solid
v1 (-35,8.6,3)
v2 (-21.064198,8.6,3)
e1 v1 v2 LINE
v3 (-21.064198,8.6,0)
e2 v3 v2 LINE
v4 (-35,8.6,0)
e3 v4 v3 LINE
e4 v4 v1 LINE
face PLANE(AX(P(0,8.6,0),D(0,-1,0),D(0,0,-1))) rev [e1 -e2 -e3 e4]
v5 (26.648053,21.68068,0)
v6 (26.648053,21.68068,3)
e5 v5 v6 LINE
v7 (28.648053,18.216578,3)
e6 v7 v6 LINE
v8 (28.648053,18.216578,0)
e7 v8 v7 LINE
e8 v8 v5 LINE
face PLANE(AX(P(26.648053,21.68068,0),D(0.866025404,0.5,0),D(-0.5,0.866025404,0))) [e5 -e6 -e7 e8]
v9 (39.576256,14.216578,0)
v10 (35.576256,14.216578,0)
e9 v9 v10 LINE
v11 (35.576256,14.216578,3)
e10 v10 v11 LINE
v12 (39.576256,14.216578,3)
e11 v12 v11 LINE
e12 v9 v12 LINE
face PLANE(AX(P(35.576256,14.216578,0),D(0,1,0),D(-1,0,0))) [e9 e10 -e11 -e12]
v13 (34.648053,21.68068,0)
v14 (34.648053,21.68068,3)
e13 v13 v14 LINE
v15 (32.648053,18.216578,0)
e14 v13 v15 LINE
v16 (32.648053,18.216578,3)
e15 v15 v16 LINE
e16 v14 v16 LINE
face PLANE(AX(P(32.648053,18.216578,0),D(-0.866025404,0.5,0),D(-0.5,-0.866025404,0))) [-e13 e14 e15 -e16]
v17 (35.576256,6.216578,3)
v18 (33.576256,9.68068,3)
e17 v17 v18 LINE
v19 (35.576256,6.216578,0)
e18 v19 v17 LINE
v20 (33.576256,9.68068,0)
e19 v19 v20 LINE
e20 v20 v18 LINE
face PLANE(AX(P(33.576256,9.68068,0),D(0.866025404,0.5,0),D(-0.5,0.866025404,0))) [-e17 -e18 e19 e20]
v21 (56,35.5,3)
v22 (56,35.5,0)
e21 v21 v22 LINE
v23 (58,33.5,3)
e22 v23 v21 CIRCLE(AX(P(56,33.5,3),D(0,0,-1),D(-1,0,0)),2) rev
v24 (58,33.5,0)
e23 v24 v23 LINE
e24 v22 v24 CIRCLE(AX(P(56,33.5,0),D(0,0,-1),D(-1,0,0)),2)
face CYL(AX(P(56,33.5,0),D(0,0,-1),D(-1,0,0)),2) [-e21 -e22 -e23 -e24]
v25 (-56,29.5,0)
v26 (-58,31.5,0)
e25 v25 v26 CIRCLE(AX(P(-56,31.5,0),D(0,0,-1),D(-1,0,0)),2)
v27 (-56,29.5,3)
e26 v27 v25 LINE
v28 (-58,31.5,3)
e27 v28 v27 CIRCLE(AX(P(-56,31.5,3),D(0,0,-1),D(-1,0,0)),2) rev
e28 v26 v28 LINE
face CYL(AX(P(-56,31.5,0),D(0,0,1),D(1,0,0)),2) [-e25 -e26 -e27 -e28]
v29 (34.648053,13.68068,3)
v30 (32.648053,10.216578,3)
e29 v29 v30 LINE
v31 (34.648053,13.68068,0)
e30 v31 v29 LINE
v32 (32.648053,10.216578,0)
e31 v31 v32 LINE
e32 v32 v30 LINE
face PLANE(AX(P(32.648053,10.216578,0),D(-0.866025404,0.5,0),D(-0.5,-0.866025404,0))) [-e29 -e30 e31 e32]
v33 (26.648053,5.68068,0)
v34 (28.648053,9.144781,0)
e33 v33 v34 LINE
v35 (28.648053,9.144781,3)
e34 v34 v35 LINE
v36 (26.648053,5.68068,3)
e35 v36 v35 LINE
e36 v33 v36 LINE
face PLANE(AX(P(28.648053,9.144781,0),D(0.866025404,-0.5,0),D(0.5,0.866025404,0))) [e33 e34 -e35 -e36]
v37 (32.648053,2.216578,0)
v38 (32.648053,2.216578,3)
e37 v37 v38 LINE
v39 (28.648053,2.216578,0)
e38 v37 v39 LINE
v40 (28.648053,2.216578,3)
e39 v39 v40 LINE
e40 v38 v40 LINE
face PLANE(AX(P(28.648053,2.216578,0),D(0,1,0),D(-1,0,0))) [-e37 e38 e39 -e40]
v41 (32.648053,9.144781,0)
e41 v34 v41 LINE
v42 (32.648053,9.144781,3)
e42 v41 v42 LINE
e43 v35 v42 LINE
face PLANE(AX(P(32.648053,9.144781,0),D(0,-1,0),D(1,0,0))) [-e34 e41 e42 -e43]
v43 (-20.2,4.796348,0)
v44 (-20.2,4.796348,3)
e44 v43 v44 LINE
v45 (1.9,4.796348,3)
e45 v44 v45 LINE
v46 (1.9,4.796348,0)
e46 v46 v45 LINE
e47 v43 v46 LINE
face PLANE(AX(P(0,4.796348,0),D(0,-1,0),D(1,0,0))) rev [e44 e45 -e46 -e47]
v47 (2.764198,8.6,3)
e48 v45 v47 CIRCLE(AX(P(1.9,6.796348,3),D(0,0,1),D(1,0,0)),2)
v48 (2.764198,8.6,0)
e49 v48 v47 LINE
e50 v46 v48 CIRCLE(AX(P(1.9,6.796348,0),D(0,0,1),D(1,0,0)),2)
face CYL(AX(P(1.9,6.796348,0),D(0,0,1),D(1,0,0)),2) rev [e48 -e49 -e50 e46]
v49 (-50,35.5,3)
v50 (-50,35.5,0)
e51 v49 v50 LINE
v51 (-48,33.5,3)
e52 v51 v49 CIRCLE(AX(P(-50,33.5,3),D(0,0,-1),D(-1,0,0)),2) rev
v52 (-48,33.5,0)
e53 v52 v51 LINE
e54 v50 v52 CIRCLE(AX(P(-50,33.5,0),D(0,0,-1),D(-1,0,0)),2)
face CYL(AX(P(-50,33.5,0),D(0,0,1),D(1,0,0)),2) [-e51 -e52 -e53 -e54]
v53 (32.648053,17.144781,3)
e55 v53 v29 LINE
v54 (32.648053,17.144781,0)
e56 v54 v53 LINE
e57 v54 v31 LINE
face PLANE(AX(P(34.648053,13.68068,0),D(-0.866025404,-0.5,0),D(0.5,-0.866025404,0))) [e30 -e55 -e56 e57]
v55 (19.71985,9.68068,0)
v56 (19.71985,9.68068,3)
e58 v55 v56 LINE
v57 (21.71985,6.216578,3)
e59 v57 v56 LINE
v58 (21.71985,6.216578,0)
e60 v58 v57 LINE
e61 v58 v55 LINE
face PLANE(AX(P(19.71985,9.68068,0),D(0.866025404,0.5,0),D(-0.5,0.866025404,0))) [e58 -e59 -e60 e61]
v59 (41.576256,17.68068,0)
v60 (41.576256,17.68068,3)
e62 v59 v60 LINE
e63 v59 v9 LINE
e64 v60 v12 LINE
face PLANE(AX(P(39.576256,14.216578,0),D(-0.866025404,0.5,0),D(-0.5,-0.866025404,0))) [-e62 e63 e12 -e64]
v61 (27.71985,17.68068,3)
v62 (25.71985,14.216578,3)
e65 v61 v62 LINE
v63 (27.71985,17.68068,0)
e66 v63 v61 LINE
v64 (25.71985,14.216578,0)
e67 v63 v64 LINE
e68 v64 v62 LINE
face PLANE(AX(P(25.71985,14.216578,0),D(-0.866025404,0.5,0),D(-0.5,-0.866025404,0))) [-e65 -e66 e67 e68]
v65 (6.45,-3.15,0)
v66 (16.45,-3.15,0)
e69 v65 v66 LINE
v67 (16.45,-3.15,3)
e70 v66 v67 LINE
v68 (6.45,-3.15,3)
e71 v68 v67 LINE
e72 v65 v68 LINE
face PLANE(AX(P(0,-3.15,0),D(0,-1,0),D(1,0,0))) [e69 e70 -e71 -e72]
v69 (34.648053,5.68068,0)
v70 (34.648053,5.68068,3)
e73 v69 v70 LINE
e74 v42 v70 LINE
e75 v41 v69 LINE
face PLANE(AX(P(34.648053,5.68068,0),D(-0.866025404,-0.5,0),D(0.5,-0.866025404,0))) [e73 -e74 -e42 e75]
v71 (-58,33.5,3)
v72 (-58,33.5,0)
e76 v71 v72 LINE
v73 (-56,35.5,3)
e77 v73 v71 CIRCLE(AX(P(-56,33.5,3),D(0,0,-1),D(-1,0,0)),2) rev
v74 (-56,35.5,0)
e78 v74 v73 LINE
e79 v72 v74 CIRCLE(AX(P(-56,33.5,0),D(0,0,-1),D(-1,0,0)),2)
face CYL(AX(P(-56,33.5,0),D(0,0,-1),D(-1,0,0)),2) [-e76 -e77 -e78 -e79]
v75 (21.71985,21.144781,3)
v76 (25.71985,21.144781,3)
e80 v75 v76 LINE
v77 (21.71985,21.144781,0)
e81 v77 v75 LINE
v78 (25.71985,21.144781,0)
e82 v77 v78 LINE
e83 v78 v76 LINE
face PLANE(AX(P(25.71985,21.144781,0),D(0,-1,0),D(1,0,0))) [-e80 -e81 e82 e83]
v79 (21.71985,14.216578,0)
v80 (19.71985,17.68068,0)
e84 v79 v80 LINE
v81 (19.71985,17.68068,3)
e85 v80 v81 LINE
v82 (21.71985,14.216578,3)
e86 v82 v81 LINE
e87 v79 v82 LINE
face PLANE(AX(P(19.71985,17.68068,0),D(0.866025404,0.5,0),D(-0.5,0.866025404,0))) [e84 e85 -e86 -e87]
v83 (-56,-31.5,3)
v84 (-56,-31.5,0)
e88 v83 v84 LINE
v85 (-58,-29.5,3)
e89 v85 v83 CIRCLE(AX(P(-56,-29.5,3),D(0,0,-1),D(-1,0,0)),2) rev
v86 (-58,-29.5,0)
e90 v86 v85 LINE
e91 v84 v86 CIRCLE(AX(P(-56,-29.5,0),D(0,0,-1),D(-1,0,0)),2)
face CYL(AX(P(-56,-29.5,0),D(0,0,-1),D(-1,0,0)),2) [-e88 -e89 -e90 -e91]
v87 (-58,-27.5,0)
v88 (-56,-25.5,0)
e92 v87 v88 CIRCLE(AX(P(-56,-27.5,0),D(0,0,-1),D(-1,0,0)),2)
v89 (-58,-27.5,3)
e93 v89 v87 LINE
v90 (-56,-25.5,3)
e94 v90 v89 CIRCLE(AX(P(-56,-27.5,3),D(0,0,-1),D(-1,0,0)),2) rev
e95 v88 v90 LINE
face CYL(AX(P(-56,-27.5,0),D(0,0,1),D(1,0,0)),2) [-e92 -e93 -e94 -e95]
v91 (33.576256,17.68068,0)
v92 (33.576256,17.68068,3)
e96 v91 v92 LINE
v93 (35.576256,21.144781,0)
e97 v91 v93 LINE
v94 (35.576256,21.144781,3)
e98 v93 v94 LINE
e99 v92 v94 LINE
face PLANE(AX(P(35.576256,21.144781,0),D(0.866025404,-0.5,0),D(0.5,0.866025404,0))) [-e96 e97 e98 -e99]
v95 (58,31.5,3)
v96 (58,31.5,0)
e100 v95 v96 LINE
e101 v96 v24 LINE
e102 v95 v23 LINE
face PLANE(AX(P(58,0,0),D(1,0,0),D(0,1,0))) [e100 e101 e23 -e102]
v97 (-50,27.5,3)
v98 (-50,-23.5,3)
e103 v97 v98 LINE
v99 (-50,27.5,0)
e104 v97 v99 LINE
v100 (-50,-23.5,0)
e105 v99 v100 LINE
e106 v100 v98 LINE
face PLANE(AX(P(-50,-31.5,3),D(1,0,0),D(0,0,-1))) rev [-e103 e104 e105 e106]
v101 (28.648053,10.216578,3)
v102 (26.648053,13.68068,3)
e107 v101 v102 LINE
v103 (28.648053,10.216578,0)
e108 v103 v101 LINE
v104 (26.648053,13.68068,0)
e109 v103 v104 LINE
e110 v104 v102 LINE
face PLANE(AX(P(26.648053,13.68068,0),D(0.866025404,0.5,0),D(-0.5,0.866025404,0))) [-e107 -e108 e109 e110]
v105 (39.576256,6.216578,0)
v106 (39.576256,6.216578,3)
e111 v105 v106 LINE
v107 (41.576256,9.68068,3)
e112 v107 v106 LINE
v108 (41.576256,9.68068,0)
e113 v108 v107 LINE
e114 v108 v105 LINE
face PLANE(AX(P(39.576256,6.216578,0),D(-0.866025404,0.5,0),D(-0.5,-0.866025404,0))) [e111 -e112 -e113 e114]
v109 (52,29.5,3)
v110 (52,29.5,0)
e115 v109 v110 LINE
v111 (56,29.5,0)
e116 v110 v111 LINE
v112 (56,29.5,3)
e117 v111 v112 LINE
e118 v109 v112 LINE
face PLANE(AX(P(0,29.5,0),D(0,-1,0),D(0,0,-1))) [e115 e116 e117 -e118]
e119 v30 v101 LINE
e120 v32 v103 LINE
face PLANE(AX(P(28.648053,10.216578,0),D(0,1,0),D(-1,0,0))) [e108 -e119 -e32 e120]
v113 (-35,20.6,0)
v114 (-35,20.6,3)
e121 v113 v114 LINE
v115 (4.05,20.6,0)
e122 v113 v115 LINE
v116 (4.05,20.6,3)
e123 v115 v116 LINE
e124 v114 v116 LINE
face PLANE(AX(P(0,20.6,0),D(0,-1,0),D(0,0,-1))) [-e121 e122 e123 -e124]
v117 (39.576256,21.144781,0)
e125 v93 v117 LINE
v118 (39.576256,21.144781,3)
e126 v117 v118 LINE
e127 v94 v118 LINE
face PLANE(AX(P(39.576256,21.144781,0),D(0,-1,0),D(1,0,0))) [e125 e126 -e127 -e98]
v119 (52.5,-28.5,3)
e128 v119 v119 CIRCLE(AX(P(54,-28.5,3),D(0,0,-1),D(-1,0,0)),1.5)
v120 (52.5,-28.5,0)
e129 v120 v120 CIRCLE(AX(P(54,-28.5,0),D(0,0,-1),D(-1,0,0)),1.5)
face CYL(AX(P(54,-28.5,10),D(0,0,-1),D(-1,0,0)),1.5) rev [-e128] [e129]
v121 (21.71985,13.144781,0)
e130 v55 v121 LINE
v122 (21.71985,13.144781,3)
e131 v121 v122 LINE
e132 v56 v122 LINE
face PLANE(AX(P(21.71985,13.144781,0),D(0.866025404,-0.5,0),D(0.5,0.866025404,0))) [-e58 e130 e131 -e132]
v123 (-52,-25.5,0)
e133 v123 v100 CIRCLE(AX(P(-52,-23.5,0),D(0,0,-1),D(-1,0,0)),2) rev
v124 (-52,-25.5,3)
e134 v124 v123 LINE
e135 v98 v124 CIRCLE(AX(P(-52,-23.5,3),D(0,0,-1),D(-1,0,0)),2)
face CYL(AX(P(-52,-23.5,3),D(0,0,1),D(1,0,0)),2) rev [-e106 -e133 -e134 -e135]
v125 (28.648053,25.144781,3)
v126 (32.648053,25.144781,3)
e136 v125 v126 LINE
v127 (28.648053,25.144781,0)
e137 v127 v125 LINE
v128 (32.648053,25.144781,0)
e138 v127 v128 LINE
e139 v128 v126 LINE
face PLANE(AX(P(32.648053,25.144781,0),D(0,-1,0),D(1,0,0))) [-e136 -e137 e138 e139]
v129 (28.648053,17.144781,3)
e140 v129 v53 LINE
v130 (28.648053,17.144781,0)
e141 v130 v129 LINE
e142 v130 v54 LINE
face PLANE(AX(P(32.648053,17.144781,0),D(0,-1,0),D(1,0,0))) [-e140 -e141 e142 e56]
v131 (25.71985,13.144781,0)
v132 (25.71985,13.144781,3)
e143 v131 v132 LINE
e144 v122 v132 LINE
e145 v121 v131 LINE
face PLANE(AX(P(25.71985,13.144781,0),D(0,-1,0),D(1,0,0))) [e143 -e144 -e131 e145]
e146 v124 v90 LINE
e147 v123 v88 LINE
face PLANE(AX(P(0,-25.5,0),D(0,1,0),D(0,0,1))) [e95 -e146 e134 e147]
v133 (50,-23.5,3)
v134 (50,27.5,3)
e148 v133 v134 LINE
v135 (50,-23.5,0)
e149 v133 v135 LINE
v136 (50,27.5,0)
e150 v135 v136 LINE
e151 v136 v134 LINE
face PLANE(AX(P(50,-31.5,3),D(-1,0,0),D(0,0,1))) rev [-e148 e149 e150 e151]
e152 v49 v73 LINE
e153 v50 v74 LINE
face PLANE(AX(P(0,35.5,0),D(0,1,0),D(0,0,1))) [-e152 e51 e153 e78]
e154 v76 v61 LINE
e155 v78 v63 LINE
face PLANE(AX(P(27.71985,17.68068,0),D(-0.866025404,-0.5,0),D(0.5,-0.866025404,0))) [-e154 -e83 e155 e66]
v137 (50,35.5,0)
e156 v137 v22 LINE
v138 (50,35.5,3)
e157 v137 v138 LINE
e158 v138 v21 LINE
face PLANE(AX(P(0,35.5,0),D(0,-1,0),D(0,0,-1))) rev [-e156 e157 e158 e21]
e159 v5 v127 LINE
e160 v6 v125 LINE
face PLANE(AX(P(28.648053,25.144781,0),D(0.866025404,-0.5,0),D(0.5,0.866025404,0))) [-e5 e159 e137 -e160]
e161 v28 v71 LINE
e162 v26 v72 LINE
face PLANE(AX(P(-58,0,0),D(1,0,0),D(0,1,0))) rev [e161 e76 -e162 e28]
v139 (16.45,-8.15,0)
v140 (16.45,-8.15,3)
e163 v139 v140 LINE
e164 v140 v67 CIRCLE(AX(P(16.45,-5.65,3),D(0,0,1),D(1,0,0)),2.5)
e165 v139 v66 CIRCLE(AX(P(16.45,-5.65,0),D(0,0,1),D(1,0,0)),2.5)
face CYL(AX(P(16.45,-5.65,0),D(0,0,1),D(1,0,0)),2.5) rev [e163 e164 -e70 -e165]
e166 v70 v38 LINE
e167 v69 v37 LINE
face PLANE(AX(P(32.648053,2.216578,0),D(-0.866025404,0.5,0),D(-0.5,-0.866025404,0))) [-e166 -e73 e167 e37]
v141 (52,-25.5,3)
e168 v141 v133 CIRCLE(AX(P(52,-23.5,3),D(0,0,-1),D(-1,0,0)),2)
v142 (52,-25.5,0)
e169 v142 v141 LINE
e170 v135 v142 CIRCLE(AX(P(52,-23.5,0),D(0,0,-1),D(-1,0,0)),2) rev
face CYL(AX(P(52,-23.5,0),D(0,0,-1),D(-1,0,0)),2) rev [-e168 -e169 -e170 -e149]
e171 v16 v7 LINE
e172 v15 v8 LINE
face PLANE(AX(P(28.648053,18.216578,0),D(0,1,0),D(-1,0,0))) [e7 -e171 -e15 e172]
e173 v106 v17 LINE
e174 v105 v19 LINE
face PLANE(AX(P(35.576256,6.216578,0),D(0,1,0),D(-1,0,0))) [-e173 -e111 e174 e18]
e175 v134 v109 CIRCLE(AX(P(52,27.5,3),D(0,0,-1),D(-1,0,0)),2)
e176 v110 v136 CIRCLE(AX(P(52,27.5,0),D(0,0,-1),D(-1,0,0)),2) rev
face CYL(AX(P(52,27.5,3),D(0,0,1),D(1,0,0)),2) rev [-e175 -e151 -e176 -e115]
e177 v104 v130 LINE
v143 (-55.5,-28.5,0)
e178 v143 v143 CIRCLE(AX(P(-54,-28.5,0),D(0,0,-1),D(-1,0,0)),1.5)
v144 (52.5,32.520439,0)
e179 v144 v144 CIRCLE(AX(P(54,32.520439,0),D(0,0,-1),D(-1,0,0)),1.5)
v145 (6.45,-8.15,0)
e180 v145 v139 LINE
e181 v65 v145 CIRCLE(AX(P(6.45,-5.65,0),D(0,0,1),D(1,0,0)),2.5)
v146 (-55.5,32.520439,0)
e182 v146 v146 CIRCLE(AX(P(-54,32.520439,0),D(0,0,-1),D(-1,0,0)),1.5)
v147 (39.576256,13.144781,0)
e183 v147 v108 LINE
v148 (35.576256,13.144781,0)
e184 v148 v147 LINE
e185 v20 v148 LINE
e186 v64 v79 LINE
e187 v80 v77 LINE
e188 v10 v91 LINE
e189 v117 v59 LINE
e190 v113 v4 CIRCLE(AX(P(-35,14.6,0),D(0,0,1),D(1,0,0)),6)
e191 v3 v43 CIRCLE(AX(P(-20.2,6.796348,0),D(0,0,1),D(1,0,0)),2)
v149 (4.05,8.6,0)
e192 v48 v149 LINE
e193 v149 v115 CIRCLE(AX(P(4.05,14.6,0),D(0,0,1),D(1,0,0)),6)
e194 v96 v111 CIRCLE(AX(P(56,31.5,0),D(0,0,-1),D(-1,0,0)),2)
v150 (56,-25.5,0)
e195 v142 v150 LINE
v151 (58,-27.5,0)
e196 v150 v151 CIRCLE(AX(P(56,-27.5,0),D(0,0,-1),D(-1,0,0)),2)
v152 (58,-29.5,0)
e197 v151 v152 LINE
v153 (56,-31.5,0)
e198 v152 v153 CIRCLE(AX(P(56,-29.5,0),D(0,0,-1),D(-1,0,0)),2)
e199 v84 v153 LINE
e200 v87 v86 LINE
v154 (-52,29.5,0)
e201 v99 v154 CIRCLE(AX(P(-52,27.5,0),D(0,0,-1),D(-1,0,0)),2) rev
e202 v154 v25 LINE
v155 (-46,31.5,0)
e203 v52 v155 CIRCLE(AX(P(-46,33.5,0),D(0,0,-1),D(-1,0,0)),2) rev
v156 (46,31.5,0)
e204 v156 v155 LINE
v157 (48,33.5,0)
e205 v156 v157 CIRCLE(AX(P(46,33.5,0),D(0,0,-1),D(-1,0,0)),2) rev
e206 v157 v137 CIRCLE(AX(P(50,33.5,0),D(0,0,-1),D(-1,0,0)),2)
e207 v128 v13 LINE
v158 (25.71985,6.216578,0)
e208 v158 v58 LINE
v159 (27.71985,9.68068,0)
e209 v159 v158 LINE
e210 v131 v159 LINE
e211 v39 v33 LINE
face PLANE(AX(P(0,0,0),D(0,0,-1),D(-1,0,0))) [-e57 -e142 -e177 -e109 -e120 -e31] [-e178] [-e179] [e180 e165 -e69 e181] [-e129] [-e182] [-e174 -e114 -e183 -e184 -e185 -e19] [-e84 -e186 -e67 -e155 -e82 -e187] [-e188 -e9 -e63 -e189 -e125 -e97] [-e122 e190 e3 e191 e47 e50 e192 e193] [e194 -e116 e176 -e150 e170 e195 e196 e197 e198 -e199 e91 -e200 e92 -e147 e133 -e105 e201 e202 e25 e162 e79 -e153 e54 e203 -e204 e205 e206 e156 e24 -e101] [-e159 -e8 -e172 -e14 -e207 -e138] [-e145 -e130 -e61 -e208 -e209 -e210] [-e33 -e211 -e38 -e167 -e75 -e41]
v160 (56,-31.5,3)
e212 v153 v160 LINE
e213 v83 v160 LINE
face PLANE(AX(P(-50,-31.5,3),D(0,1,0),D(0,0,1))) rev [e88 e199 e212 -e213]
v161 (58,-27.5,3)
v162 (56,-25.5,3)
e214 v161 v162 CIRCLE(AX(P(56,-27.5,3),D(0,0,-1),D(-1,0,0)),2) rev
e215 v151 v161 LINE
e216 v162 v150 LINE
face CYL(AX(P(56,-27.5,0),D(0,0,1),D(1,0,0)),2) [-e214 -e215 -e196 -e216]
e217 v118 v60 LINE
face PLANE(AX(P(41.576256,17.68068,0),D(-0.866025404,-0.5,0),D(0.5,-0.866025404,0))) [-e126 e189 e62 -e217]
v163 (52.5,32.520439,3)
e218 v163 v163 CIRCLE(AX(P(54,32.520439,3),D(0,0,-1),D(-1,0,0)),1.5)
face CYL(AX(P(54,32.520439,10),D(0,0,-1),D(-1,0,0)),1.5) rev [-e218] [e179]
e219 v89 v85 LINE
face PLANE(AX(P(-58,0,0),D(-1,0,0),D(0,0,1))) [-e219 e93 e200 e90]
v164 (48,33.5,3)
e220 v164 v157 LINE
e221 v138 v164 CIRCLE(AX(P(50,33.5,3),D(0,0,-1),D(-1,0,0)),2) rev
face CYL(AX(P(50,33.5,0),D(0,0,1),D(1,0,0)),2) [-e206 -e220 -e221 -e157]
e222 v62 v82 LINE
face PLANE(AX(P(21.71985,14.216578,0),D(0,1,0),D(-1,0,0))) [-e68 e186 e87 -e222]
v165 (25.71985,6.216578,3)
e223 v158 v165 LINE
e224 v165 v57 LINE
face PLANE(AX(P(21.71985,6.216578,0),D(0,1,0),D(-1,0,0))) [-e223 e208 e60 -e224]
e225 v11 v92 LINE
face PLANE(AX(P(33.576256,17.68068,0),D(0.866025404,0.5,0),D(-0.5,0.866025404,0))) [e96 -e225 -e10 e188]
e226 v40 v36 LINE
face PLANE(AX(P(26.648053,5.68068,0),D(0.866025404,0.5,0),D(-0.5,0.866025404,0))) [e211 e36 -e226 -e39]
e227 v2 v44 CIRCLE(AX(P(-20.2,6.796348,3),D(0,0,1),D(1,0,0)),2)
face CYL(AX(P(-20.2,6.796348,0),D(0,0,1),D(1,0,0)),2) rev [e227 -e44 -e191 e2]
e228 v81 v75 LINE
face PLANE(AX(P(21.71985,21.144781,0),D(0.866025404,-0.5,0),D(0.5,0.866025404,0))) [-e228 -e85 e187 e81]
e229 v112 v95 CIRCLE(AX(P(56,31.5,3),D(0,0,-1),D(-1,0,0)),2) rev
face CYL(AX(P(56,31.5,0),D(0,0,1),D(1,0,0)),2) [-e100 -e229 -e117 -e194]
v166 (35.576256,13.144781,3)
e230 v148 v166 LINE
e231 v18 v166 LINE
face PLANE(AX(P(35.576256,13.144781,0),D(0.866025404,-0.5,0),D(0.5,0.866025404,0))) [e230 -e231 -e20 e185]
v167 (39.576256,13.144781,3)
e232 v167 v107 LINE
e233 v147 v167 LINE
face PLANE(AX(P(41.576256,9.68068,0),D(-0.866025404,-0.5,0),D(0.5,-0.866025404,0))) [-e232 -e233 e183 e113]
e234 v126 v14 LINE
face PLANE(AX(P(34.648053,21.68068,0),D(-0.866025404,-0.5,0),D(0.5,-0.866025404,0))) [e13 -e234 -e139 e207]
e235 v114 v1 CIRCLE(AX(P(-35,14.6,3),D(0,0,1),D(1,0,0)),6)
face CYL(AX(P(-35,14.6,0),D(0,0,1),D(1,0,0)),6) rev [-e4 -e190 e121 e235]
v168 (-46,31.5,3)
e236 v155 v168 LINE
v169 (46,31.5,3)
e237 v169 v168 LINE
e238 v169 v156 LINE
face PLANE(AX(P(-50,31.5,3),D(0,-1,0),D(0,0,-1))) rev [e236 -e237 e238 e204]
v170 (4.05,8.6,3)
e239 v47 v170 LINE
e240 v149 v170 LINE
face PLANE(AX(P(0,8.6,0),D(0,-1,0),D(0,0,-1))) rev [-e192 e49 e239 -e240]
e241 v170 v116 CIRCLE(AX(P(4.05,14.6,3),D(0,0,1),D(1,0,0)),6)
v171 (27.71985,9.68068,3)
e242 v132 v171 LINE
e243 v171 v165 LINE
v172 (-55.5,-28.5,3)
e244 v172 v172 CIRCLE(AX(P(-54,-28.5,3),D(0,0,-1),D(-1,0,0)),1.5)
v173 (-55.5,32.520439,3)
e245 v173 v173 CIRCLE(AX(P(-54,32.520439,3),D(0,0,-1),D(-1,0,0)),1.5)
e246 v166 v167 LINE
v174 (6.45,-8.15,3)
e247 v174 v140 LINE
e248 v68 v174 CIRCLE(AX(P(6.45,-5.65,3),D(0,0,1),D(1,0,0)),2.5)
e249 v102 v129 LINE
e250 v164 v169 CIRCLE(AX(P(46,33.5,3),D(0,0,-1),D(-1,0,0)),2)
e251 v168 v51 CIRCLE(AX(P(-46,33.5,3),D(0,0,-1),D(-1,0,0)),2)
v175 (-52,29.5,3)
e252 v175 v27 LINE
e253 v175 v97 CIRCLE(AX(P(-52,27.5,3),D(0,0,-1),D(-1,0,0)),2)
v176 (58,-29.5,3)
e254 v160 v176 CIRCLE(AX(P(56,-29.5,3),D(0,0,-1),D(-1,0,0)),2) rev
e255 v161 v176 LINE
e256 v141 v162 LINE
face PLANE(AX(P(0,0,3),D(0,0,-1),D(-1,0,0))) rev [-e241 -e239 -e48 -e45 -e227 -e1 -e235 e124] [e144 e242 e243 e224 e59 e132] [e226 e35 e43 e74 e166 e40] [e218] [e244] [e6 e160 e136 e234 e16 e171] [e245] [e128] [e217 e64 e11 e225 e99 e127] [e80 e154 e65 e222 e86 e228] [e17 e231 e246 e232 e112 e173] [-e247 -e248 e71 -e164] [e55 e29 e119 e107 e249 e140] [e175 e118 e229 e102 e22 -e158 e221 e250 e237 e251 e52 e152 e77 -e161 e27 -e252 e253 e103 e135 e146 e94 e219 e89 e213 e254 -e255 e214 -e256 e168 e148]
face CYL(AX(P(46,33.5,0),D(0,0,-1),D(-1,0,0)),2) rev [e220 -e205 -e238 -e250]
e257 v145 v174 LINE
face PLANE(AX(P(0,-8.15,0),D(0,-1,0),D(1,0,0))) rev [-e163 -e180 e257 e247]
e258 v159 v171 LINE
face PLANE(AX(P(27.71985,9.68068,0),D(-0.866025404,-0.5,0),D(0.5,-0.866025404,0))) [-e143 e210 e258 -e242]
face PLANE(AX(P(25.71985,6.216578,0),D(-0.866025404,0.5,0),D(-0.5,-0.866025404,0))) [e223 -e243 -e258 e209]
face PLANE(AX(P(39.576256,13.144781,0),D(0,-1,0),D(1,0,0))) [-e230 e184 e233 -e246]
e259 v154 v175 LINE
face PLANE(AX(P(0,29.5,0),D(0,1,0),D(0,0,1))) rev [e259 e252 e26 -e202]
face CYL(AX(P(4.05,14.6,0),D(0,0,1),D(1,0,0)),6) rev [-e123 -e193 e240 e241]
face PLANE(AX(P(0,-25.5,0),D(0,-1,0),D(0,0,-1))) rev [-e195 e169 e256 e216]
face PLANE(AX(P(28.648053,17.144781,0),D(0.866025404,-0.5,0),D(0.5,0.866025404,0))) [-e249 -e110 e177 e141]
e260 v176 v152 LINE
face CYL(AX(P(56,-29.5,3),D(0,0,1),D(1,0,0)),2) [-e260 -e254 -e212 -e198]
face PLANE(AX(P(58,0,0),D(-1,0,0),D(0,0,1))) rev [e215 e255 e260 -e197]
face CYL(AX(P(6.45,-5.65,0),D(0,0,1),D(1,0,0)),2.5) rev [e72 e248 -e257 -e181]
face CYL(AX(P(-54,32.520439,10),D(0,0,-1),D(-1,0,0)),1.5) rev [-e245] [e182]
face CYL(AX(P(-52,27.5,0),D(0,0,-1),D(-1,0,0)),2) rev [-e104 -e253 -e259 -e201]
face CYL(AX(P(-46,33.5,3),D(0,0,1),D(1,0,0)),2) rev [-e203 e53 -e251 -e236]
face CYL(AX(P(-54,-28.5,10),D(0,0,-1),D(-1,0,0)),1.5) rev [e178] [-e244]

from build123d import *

# Parameters (mm, degrees)
SKETCH3_W           = 100
SKETCH3_H           = 63
BOSS_EXTRUDE1_DEPTH = 3
BOSS_EXTRUDE2_START = -3
SKETCH5_W           = 8
SKETCH5_H           = 6
BOSS_EXTRUDE2_DEPTH = 3
FILLET2_R           = 2
CUT_EXTRUDE1_DEPTH  = 3
CUT_EXTRUDE2_START  = -3
CUT_EXTRUDE2_DEPTH  = 3
CUT_EXTRUDE3_START  = -3
SKETCH8_W           = 39.05
SKETCH8_H           = 6
CUT_EXTRUDE3_DEPTH  = 3
SKETCH9_R           = 1.5
CUT_EXTRUDE4_DEPTH  = 10
FILL_PATTERN1_DEPTH = 3


# Read off the part's stored shape, not the designer's step: Cut-Extrude2, Fill Pattern1
with BuildPart() as part:
    # Sketch3 → Boss-Extrude1 (new body)
    with BuildSketch(Plane.XY):
        Rectangle(SKETCH3_W, SKETCH3_H)
    extrude(amount=BOSS_EXTRUDE1_DEPTH)

    # Sketch5 → Boss-Extrude2 (add)
    with BuildSketch(Plane(origin=(0, 0, 0), x_dir=(-1, 0, 0), z_dir=(0, 0, -1)).offset(BOSS_EXTRUDE2_START)):
        with Locations((-54, -28.5)):
            Rectangle(SKETCH5_W, SKETCH5_H)
        Polygon((-58, 29.5), (-50, 29.5), (-50, 31.5), (-48, 31.5), (-48, 35.5), (-58, 35.5), align=None)
        with Locations((54, -28.5)):
            Rectangle(SKETCH5_W, SKETCH5_H)
        Polygon((48, 35.5), (48, 31.5), (50, 31.5), (50, 29.5), (58, 29.5), (58, 35.5), align=None)
    extrude(amount=BOSS_EXTRUDE2_DEPTH)

    # Fillet2
    fillet2_edges = [part.edges().sort_by_distance(p)[0] for p in [
        (48, 35.5, 1.5),
        (58, 35.5, 1.5),
        (58, 29.5, 1.5),
        (50, 29.5, 1.5),
        (58, -31.5, 1.5),
        (58, -25.5, 1.5),
        (50, -25.5, 1.5),
        (-58, -31.5, 1.5),
        (-58, -25.5, 1.5),
        (-50, -25.5, 1.5),
        (-50, 29.5, 1.5),
        (-58, 29.5, 1.5),
        (-58, 35.5, 1.5),
        (-48, 35.5, 1.5),
        (-48, 31.5, 1.5),
        (48, 31.5, 1.5),
    ]]
    fillet(fillet2_edges, radius=FILLET2_R - 0.0001)  # a hair under: the kernel refuses the full size

    # Sketch6 → Cut-Extrude1 (cut)
    with BuildSketch(Plane.XY.offset(3)):
        with BuildLine():
            ThreePointArc((6.45, -3.15), (4.682233047, -3.882233047), (3.95, -5.65))
            Line((3.95, -5.65), (11.45, -5.65))
            Line((11.45, -5.65), (11.45, -3.15))
            Line((11.45, -3.15), (6.45, -3.15))
        make_face()
        with BuildLine():
            Line((11.45, -3.15), (11.45, -5.65))
            Line((11.45, -5.65), (18.95, -5.65))
            ThreePointArc((18.95, -5.65), (18.217766953, -3.882233047), (16.45, -3.15))
            Line((16.45, -3.15), (11.45, -3.15))
        make_face()
        with BuildLine():
            Line((18.95, -5.65), (11.45, -5.65))
            Line((11.45, -5.65), (11.45, -8.15))
            Line((11.45, -8.15), (16.45, -8.15))
            ThreePointArc((16.45, -8.15), (18.217766953, -7.417766953), (18.95, -5.65))
        make_face()
        with BuildLine():
            Line((11.45, -5.65), (3.95, -5.65))
            ThreePointArc((3.95, -5.65), (4.682233047, -7.417766953), (6.45, -8.15))
            Line((6.45, -8.15), (11.45, -8.15))
            Line((11.45, -8.15), (11.45, -5.65))
        make_face()
    extrude(amount=-CUT_EXTRUDE1_DEPTH, mode=Mode.SUBTRACT)

    # Cut-Extrude2 outline → Cut-Extrude2 (cut)
    with BuildSketch(Plane.XY.offset(3).offset(CUT_EXTRUDE2_START)):
        with BuildLine():
            Line((-11.2, 8.796347875), (-20.2, 8.796347875))
            ThreePointArc((-20.2, 8.796347875), (-22.2, 6.796347875), (-20.2, 4.796347875))
            Line((-20.2, 4.796347875), (1.9, 4.796347875))
            ThreePointArc((1.9, 4.796347875), (3.9, 6.796347875), (1.9, 8.796347875))
            Line((1.9, 8.796347875), (-11.19861108, 8.796347875))
            Line((-11.19861108, 8.796347875), (-11.2, 8.796347875))
        make_face()
    extrude(amount=CUT_EXTRUDE2_DEPTH, mode=Mode.SUBTRACT)

    # Sketch8 → Cut-Extrude3 (cut)
    with BuildSketch(Plane.XY.offset(3).offset(CUT_EXTRUDE3_START)):
        with BuildLine():
            Line((4.05, 14.6), (-35, 14.6))
            Line((-35, 14.6), (-35, 8.6))
            Line((-35, 8.6), (-21.064198479, 8.6))
            ThreePointArc((-21.064198479, 8.6), (-20.643111582, 8.746643269), (-20.2, 8.796347875))
            Line((-20.2, 8.796347875), (-11.2, 8.796347875))
            Line((-11.2, 8.796347875), (-11.19861108, 8.796347392))
            Line((-11.19861108, 8.796347392), (1.9, 8.796347875))
            ThreePointArc((1.9, 8.796347875), (2.343111582, 8.746643269), (2.764198479, 8.6))
            Line((2.764198479, 8.6), (4.05, 8.6))
            Line((4.05, 8.6), (4.05, 14.6))
        make_face()
        with BuildLine():
            ThreePointArc((-35, 20.6), (-39.242640687, 18.842640687), (-41, 14.6))
            Line((-41, 14.6), (-35, 14.6))
            Line((-35, 14.6), (-35, 20.6))
        make_face()
        with BuildLine():
            Line((-35, 14.6), (-41, 14.6))
            ThreePointArc((-41, 14.6), (-39.242640687, 10.357359313), (-35, 8.6))
            Line((-35, 8.6), (-35, 14.6))
        make_face()
        with Locations((-15.475, 17.6)):
            Rectangle(SKETCH8_W, SKETCH8_H)
        with BuildLine():
            Line((4.05, 20.6), (4.05, 14.6))
            Line((4.05, 14.6), (10.05, 14.6))
            ThreePointArc((10.05, 14.6), (8.292640687, 18.842640687), (4.05, 20.6))
        make_face()
        with BuildLine():
            Line((10.05, 14.6), (4.05, 14.6))
            Line((4.05, 14.6), (4.05, 8.6))
            ThreePointArc((4.05, 8.6), (8.292640687, 10.357359313), (10.05, 14.6))
        make_face()
    extrude(amount=CUT_EXTRUDE3_DEPTH, mode=Mode.SUBTRACT)

    # Sketch9 → Cut-Extrude4 (cut)
    with BuildSketch(Plane(origin=(0, 0, 0), x_dir=(-1, 0, 0), z_dir=(0, 0, -1))):
        with Locations((-54, 32.520438715)):
            Circle(SKETCH9_R)
        with Locations((54, 32.520438715)):
            Circle(SKETCH9_R)
        with Locations((-54, -28.5)):
            Circle(SKETCH9_R)
        with Locations((54, -28.5)):
            Circle(SKETCH9_R)
    extrude(amount=-CUT_EXTRUDE4_DEPTH, mode=Mode.SUBTRACT)

    # Fill Pattern1 outline → Fill Pattern1 (cut)
    with BuildSketch(Plane.XY):
        Polygon((34.648052979, 5.68067969), (32.648052979, 9.144781305), (28.648052979, 9.144781305), (26.648052979, 5.68067969), (28.648052979, 2.216578074), (32.648052979, 2.216578074), align=None)
        Polygon((27.719849748, 17.68067969), (25.719849748, 21.144781305), (21.719849748, 21.144781305), (19.719849748, 17.68067969), (21.719849748, 14.216578074), (25.719849748, 14.216578074), align=None)
        Polygon((35.576256209, 21.144781305), (33.576256209, 17.68067969), (35.576256209, 14.216578074), (39.576256209, 14.216578074), (41.576256209, 17.68067969), (39.576256209, 21.144781305), align=None)
        Polygon((34.648052979, 21.68067969), (32.648052979, 25.144781305), (28.648052979, 25.144781305), (26.648052979, 21.68067969), (28.648052979, 18.216578074), (32.648052979, 18.216578074), align=None)
        Polygon((41.576256209, 9.68067969), (39.576256209, 13.144781305), (35.576256209, 13.144781305), (33.576256209, 9.68067969), (35.576256209, 6.216578074), (39.576256209, 6.216578074), align=None)
        Polygon((21.719849748, 13.144781305), (19.719849748, 9.68067969), (21.719849748, 6.216578074), (25.719849748, 6.216578074), (27.719849748, 9.68067969), (25.719849748, 13.144781305), align=None)
        Polygon((34.648052979, 13.68067969), (32.648052979, 17.144781305), (28.648052979, 17.144781305), (26.648052979, 13.68067969), (28.648052979, 10.216578074), (32.648052979, 10.216578074), align=None)
    extrude(amount=FILL_PATTERN1_DEPTH, mode=Mode.SUBTRACT)


solid = part.part
